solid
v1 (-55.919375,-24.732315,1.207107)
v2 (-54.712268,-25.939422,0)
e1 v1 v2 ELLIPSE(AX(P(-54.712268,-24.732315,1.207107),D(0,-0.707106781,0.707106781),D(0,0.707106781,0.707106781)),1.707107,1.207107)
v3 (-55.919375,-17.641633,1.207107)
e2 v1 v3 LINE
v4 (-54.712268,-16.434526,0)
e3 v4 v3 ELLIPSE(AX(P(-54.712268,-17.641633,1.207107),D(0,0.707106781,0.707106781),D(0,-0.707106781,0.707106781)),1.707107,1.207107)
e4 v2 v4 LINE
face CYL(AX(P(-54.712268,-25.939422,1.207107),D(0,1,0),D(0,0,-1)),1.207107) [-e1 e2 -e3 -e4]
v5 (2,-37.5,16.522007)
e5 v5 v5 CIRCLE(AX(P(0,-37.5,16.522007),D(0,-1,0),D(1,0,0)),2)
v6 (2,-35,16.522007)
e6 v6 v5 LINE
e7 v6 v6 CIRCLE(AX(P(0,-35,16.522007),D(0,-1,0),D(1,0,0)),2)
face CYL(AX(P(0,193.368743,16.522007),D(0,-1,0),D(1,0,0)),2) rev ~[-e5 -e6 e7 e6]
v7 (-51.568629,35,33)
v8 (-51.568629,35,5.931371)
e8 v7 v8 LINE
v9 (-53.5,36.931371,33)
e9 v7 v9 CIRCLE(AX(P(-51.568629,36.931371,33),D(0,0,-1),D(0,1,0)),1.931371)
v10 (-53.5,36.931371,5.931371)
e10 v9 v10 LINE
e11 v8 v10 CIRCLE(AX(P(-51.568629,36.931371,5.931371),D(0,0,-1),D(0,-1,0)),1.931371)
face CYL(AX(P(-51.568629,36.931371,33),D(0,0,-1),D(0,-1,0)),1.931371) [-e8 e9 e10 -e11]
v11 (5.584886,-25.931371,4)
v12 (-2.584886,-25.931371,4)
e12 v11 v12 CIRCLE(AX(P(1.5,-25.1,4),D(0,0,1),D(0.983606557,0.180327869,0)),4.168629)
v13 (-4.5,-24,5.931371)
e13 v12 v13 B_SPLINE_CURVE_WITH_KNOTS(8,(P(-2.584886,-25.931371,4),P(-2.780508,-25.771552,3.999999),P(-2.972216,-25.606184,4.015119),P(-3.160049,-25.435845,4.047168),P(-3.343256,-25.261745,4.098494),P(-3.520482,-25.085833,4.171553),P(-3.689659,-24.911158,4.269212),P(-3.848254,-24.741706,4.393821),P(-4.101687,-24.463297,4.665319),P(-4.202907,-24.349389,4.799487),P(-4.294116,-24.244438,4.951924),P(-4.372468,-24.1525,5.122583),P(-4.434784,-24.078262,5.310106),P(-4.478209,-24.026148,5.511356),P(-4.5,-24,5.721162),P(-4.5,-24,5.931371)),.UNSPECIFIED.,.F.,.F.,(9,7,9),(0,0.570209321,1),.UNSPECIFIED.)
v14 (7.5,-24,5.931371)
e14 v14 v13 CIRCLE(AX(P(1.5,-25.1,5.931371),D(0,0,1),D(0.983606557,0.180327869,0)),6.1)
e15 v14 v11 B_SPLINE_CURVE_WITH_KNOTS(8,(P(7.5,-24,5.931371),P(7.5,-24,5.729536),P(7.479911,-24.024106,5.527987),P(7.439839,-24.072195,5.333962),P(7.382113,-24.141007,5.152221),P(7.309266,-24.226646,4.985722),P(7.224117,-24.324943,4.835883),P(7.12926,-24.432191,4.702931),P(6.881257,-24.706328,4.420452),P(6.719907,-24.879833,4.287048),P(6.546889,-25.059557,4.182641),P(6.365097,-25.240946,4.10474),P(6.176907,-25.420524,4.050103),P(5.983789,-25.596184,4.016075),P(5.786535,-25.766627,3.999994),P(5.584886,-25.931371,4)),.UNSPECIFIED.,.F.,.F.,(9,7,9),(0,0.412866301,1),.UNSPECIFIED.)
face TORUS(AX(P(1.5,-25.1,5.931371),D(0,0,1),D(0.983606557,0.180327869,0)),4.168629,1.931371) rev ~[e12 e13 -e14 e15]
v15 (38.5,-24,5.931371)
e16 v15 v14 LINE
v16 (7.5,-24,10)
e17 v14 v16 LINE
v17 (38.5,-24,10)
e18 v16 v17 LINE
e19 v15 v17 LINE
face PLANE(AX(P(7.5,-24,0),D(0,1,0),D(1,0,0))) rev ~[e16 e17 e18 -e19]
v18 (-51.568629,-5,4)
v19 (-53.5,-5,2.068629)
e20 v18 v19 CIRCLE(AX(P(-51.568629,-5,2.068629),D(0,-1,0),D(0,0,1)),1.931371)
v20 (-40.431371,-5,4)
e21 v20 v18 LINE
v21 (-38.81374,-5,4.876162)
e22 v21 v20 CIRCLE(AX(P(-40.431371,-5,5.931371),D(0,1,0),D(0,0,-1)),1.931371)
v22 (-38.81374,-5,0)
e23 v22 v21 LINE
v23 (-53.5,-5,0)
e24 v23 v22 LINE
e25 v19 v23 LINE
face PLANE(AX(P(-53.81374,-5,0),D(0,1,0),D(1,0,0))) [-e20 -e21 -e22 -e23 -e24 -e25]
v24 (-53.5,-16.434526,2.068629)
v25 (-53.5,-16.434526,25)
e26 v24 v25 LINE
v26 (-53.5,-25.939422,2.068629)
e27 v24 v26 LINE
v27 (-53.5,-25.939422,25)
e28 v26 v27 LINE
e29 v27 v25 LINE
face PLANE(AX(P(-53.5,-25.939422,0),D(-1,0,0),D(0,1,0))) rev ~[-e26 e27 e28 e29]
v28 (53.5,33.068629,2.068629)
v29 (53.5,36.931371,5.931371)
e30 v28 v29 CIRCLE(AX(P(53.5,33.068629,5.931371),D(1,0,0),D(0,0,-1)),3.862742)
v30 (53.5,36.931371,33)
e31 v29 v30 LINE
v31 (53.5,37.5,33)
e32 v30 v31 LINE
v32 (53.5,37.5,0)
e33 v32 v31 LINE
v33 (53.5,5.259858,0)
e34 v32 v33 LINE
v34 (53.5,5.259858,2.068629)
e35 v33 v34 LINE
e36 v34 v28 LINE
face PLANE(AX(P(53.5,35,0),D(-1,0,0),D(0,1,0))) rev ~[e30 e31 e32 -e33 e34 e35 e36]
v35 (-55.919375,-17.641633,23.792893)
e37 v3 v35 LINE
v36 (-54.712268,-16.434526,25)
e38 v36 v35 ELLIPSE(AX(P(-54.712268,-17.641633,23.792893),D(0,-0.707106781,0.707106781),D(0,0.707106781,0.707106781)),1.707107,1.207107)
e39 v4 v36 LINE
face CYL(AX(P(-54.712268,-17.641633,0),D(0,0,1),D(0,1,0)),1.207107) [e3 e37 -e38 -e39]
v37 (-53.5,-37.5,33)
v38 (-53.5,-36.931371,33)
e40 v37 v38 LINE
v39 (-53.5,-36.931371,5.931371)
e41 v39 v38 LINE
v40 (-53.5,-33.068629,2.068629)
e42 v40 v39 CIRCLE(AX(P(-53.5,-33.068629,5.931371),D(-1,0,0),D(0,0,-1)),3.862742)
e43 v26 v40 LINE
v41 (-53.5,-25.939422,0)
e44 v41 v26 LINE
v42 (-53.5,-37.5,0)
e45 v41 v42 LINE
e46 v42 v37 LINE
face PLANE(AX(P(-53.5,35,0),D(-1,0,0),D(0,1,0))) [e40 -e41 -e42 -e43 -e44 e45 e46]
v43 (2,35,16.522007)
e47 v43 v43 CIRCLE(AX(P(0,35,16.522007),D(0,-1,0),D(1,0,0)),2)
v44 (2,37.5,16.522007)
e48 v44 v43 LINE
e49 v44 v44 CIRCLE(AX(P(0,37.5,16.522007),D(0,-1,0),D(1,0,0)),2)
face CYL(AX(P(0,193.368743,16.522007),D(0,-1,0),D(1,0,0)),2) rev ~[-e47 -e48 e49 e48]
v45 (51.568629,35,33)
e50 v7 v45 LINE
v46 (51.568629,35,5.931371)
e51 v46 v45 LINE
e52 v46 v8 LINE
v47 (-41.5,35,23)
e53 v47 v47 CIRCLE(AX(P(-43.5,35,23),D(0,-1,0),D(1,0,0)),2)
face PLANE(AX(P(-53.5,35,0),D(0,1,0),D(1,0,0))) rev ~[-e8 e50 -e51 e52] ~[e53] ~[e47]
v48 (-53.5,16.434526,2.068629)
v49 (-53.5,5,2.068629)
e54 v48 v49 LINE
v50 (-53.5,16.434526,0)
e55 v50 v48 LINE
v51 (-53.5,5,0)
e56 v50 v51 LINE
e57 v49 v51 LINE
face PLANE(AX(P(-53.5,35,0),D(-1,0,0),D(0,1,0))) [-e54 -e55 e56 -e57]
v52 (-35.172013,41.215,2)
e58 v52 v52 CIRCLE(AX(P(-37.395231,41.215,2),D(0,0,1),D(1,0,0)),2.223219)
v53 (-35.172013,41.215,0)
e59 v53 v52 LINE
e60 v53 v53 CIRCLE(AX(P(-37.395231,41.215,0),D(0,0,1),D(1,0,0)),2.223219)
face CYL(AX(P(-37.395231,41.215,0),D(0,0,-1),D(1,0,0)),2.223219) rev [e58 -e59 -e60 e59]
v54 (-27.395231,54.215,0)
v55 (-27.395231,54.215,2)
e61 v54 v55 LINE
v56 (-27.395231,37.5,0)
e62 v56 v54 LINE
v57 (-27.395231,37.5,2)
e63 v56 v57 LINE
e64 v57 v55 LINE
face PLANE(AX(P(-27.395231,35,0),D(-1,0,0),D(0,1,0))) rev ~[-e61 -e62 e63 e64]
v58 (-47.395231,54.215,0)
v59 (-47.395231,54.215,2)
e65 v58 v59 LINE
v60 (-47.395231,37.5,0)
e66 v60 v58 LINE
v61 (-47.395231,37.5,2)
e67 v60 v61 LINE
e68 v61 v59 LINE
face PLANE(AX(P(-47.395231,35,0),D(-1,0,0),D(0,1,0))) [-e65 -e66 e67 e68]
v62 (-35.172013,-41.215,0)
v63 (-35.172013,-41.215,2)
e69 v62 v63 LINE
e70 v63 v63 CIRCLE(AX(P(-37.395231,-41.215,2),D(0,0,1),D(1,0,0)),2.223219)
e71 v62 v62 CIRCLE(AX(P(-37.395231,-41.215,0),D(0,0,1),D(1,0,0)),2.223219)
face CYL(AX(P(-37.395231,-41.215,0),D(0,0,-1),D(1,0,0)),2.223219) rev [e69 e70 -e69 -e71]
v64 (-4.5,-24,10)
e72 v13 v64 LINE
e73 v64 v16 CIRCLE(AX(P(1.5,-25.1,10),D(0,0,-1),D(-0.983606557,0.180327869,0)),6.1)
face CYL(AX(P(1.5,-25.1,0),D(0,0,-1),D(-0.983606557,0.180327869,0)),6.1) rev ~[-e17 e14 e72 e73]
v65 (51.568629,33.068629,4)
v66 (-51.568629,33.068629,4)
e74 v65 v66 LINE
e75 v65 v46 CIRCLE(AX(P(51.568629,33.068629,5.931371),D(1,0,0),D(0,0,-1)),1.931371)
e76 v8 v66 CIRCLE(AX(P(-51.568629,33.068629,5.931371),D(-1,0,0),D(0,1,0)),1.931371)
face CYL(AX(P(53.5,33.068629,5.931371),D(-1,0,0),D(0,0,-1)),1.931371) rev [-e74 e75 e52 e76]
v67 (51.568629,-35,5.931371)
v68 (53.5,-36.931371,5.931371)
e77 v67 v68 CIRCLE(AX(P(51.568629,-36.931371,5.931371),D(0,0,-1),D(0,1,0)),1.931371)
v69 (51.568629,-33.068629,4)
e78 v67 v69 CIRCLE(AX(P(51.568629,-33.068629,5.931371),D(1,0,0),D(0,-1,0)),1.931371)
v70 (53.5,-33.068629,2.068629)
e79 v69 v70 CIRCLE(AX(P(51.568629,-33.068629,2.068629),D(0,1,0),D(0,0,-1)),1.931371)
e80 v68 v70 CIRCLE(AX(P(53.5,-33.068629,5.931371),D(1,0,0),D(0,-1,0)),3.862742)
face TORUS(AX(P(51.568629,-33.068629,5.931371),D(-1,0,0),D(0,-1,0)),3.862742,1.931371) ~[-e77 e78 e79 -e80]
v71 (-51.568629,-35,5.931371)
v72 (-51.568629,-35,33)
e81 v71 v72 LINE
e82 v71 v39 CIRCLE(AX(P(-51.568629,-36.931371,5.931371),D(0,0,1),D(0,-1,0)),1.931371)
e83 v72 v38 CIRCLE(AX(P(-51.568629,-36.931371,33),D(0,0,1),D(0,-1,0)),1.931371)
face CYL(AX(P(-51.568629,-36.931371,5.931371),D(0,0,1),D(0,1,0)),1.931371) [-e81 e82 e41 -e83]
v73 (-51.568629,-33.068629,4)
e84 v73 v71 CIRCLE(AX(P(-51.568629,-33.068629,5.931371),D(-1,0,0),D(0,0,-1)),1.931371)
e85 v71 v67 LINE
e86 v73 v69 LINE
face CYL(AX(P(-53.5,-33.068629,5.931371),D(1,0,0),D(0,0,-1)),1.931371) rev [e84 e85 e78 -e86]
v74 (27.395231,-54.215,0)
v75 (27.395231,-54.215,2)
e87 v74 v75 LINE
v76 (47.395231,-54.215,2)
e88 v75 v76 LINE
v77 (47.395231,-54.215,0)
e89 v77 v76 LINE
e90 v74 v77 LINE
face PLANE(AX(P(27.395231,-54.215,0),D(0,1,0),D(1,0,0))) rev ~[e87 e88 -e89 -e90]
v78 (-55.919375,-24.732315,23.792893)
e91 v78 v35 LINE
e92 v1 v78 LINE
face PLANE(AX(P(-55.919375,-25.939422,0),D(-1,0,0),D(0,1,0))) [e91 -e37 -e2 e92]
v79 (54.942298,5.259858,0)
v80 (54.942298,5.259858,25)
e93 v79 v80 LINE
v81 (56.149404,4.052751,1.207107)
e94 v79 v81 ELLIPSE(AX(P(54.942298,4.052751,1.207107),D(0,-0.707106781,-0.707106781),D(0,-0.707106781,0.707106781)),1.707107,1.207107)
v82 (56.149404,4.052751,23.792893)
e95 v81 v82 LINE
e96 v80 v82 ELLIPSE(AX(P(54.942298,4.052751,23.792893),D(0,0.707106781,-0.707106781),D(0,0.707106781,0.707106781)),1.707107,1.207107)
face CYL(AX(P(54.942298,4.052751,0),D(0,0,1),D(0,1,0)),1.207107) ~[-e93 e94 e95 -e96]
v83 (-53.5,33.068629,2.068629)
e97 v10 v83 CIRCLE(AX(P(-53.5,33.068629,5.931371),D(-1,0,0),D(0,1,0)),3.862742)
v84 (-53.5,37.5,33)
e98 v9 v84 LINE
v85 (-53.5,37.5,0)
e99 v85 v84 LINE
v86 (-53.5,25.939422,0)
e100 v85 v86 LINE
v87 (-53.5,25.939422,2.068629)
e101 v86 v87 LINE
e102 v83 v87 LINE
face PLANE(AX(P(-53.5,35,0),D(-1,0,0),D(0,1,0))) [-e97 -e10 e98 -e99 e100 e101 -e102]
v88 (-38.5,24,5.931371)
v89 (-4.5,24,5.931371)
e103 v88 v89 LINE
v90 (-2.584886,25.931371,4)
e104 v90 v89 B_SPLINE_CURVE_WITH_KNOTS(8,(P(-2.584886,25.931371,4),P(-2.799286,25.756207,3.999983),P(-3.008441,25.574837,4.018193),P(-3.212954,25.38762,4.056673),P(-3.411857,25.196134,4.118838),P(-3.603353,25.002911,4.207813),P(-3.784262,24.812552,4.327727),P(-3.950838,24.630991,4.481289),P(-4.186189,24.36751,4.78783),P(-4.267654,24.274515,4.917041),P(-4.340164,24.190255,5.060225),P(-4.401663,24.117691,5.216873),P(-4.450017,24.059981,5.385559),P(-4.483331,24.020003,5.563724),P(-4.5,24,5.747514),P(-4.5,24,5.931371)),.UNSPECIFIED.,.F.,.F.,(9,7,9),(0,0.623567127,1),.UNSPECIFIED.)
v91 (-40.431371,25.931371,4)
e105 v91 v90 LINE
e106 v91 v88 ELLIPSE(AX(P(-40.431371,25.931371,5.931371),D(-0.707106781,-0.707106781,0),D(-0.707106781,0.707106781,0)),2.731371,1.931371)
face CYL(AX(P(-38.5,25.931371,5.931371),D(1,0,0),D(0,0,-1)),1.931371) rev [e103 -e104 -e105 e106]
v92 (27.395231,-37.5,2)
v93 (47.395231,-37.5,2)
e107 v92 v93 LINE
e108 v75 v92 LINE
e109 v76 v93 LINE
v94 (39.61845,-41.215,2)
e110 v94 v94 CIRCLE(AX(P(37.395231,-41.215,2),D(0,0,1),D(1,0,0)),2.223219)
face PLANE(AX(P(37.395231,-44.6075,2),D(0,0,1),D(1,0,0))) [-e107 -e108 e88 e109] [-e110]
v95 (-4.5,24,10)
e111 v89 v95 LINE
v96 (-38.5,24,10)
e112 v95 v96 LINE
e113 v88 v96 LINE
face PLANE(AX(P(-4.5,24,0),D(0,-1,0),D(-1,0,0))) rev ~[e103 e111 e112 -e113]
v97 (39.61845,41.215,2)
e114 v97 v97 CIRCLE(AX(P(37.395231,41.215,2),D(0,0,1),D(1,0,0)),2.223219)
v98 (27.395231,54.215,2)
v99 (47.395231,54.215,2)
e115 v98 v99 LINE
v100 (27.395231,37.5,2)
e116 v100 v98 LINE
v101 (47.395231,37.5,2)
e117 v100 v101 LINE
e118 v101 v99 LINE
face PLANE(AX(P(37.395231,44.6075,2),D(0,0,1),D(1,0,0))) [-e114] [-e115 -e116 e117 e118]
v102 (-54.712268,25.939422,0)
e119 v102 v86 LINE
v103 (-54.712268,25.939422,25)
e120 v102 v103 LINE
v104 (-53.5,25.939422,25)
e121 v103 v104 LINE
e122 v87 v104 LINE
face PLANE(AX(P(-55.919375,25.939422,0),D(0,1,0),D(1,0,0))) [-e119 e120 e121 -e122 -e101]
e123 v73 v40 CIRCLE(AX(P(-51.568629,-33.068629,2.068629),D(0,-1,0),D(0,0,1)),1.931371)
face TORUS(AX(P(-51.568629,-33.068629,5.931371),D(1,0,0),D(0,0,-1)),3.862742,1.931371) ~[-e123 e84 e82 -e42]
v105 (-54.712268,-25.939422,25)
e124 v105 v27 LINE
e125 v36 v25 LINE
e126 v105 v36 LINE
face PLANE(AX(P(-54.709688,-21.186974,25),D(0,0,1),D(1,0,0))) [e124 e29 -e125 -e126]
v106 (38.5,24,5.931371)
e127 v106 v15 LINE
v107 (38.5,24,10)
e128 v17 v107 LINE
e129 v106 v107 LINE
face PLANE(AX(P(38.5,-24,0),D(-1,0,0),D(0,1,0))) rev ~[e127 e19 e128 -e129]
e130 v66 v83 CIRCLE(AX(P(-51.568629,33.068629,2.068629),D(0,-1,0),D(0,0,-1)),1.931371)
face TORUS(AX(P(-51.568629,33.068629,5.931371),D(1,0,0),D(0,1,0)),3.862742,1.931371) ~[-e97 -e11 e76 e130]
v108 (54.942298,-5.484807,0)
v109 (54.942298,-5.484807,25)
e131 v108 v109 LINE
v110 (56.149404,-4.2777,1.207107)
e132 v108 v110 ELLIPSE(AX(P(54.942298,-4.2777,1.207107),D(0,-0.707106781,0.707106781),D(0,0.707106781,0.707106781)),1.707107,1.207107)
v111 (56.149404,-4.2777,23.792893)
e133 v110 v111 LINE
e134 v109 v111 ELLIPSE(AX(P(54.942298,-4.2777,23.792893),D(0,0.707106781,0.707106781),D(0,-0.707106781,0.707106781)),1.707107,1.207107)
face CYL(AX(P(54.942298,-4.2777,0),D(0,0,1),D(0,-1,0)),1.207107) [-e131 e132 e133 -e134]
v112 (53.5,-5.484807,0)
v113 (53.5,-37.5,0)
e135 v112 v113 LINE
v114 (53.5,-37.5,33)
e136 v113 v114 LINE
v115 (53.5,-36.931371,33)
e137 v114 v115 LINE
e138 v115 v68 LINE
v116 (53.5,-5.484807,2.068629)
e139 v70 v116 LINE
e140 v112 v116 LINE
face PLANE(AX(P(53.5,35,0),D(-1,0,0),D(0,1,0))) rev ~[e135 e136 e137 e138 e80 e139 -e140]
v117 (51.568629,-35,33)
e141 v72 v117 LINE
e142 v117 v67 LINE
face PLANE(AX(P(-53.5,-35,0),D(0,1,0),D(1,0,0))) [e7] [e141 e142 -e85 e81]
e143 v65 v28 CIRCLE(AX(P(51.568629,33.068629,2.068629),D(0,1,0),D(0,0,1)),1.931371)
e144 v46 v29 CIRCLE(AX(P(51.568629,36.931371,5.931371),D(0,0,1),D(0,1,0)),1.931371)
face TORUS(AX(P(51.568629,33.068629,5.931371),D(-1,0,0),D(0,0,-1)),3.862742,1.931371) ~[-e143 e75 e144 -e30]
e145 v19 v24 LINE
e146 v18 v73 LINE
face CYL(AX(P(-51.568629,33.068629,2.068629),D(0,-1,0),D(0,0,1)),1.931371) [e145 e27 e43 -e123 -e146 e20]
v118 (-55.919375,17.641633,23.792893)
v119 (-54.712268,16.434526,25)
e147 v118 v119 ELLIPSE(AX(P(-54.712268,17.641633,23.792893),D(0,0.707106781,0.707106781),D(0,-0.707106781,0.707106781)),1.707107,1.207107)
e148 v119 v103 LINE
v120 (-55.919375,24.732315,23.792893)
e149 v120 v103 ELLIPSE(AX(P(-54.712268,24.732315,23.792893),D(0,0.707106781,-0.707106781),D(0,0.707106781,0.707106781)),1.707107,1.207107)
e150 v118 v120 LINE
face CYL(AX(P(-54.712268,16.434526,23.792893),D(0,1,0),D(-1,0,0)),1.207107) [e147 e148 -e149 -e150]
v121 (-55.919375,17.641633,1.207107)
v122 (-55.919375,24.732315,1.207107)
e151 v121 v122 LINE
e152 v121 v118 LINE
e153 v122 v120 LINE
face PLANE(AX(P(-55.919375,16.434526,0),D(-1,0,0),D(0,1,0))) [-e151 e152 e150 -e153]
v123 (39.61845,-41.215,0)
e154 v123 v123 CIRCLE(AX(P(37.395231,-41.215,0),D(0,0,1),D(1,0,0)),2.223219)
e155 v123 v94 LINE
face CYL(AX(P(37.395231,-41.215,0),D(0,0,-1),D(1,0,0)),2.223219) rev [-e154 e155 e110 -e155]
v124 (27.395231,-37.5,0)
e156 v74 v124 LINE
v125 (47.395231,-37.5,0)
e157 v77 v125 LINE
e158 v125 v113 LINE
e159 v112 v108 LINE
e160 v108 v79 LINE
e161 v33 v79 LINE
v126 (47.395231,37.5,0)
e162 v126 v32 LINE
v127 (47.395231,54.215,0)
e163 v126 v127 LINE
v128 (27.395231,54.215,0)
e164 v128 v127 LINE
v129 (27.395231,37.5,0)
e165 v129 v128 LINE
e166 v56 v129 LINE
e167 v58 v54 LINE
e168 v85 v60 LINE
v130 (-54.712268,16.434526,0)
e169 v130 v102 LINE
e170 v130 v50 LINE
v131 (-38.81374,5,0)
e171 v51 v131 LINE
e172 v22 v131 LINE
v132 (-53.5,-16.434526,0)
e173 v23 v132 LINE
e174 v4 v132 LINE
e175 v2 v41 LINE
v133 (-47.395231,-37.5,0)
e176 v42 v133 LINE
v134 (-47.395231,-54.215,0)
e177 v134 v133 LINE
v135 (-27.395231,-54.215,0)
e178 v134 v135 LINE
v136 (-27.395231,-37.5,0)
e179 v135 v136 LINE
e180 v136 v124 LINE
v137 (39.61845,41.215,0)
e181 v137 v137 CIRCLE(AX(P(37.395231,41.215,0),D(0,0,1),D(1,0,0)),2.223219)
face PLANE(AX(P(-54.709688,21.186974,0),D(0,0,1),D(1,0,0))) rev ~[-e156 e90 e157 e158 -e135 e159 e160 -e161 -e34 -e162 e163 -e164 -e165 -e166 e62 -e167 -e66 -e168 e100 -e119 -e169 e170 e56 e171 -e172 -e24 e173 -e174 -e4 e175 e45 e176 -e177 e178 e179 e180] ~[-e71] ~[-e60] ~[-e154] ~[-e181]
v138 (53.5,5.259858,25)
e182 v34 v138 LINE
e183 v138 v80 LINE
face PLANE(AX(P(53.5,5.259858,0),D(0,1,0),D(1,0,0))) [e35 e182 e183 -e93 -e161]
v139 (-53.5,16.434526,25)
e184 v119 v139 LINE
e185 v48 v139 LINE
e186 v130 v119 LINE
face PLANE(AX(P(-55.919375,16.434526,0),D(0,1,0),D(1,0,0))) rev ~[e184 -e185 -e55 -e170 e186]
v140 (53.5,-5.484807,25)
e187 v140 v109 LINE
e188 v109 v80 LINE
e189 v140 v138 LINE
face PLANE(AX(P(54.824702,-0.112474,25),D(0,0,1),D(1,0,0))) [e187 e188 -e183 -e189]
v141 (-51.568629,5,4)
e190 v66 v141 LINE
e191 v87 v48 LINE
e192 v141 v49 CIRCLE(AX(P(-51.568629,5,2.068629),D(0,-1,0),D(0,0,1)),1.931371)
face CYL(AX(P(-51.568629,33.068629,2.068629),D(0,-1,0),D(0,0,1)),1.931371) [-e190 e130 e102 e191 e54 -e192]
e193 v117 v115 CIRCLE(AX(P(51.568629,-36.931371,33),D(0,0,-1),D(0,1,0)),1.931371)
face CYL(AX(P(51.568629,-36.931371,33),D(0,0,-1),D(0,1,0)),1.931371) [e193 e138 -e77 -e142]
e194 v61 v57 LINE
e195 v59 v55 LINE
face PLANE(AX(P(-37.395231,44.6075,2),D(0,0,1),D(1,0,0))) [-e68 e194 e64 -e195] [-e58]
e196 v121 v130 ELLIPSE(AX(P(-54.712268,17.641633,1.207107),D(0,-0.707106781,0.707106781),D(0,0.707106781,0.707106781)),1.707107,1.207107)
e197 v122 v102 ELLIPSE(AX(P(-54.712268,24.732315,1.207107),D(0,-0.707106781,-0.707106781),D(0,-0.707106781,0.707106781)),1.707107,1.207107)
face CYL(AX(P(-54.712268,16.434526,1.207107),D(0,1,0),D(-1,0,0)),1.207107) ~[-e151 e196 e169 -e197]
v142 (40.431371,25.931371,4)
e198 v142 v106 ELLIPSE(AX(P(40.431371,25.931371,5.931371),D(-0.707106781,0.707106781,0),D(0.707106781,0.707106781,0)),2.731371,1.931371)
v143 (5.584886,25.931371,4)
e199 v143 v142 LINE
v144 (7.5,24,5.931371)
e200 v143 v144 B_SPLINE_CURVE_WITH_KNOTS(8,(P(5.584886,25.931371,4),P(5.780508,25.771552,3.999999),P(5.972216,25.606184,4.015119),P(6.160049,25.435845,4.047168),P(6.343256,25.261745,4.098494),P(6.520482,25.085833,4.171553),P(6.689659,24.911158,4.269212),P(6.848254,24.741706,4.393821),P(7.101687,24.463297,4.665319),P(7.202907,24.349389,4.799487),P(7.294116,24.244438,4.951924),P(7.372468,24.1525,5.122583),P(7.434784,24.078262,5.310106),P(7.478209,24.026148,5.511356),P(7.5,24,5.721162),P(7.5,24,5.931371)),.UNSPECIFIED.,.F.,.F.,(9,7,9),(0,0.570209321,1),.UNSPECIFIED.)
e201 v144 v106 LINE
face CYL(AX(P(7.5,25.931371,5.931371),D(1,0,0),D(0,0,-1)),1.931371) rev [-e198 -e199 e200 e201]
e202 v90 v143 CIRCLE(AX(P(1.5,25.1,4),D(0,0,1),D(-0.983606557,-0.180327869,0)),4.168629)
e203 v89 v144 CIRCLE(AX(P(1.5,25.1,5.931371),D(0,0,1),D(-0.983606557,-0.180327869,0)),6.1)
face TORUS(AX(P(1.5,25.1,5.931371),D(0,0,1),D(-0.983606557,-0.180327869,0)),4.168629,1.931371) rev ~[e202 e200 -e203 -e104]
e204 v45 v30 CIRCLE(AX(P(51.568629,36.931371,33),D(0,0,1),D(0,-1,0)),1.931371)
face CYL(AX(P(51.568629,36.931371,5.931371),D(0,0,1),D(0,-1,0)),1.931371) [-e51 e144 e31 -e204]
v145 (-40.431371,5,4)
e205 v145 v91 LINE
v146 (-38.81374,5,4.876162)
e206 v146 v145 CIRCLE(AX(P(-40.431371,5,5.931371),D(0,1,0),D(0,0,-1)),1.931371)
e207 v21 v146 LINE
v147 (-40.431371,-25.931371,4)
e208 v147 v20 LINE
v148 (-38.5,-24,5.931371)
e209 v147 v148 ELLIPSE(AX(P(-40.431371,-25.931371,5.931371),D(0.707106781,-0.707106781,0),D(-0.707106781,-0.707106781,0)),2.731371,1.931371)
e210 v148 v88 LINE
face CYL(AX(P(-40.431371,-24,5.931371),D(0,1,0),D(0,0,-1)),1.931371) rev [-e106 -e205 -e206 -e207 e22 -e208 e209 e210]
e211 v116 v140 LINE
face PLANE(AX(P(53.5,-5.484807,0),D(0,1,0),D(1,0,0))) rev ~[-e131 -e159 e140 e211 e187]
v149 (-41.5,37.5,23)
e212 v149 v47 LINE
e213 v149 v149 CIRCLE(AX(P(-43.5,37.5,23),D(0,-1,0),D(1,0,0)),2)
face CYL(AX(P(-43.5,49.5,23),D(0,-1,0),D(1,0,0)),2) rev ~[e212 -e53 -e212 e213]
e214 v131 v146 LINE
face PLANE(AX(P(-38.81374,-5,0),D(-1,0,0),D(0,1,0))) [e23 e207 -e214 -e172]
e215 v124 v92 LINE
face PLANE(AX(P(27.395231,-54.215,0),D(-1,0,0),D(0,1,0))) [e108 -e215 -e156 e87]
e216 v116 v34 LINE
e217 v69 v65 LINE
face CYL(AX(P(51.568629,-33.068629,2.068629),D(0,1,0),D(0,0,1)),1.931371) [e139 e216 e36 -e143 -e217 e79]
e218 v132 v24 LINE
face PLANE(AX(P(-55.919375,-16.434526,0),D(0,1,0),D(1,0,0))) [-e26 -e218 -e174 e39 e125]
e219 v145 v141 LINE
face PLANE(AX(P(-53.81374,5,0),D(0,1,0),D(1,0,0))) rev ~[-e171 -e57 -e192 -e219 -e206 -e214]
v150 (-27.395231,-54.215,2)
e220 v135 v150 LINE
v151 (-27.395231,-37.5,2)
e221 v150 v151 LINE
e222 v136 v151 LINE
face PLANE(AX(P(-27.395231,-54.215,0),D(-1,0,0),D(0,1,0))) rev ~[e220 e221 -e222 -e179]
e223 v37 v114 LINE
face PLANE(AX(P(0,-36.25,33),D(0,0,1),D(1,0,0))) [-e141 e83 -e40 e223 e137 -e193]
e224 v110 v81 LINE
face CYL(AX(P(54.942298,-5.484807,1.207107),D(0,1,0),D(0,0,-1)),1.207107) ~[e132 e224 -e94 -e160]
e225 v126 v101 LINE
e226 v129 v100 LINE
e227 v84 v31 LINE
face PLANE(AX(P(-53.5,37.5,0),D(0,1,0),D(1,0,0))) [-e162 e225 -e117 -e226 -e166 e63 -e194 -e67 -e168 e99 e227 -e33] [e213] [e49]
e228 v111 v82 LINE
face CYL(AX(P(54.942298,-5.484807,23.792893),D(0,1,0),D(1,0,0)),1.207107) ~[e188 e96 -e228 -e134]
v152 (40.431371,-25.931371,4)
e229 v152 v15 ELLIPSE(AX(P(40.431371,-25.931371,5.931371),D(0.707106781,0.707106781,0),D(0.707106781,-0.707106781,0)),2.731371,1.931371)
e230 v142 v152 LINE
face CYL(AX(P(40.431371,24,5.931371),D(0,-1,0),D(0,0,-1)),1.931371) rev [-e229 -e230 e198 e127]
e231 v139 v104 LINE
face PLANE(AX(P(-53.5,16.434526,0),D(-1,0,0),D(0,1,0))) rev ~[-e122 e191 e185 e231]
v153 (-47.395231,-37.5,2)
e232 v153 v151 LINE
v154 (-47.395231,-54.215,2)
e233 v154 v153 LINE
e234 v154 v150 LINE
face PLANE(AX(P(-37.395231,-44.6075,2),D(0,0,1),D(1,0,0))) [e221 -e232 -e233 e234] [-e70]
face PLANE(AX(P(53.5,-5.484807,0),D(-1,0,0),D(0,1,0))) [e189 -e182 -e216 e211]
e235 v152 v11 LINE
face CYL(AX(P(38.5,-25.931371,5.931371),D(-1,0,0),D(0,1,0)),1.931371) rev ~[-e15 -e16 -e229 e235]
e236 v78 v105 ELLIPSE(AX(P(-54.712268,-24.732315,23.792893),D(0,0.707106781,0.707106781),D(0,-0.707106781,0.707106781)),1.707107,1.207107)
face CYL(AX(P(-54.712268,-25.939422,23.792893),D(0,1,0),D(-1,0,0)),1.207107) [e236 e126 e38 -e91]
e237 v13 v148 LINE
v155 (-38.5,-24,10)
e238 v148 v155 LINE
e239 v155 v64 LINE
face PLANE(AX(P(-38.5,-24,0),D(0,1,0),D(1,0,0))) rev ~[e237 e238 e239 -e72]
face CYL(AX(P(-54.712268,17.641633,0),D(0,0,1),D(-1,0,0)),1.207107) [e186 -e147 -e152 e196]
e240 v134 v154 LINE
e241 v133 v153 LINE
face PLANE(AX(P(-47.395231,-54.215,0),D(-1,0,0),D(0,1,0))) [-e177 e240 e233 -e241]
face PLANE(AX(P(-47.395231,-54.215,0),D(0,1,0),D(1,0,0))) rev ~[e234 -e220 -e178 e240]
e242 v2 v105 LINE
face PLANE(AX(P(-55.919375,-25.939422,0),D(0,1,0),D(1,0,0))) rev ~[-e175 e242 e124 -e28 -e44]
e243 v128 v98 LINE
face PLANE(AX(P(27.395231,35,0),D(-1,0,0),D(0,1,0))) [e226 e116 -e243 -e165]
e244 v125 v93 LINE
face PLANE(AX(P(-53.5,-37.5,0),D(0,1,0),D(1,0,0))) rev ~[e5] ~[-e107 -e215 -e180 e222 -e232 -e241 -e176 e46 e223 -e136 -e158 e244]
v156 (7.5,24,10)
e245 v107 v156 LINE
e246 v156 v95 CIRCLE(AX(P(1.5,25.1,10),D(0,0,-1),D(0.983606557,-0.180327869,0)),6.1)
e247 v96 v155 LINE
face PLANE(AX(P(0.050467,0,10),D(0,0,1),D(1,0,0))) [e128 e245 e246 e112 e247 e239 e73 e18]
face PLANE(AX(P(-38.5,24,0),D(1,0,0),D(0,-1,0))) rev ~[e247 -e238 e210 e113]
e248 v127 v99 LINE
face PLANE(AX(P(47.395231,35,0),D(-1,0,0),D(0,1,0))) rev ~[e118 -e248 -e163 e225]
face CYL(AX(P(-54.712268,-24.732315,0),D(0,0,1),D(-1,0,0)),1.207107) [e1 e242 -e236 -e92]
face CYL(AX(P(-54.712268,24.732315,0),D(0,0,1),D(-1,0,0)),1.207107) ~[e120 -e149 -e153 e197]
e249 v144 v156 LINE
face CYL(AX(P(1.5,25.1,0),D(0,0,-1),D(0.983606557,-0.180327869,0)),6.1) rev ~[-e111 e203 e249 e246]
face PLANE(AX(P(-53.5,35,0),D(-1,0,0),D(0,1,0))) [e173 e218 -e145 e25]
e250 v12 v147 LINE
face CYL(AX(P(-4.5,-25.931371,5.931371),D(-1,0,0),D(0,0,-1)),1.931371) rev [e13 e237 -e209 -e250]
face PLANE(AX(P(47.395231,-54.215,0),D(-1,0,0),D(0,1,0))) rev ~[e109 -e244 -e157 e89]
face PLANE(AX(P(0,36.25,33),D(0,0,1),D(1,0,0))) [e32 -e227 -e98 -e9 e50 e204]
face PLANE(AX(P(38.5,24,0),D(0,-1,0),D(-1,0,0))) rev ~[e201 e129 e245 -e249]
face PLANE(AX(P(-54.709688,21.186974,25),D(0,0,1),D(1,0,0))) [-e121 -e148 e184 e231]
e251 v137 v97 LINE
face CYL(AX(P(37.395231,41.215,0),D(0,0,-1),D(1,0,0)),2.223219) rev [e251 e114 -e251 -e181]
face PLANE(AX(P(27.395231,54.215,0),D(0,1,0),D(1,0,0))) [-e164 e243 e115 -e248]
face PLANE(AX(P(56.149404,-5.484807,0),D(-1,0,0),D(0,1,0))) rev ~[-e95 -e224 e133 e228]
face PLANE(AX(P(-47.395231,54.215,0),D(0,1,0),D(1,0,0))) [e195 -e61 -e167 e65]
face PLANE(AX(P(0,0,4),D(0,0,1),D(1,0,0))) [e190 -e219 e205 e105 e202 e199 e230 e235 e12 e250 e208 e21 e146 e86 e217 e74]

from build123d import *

# Parameters (mm, degrees)
F1_DEPTH  = 4
F0_W      = 107
F0_H      = 2.5
F2_DEPTH  = 33
F3_W      = 20
F3_H      = 19.215
F3_R      = 2.2232187412
F4_DEPTH  = 2
F6_D      = 4
F6_DEPTH  = 12
F6_TIP    = 1.2017212381
F7_D      = 4
F8_DEPTH  = 10
F9_F1_R   = 1.9313708499
F9_F2_R   = 1.9313708499
F10_W     = 15
F10_H     = 10
F11_DEPTH = 11.3
F0_W_2    = 2.4193752706
F0_H_2    = 9.5048956573
F0_W_3    = 2.649404496
F0_H_3    = 10.744664818
F12_DEPTH = 25
F13_R     = 1.2071067812


with BuildPart() as f1:
    # F0 (on Top) → F1 (new body)
    with BuildSketch(Plane.XY):
        Polygon((-53.5, -35), (53.5, -35), (53.5, -5.4848068394), (53.5, 5.2598579787), (53.5, 35), (-53.5, 35), (-53.5, 25.9394217283), (-53.5, 16.434526071), (-53.5, -16.434526071), (-53.5, -25.9394217283), align=None)
        with BuildLine():
            Line((38.5, 24), (38.5, -24))
            Line((38.5, -24), (7.5, -24))
            ThreePointArc((7.5, -24), (1.5, -19), (-4.5, -24))
            Line((-4.5, -24), (-38.5, -24))
            Line((-38.5, -24), (-38.5, 24))
            Line((-38.5, 24), (-4.5, 24))
            ThreePointArc((-4.5, 24), (1.5, 19), (7.5, 24))
            Line((7.5, 24), (38.5, 24))
        make_face(mode=Mode.SUBTRACT)
    extrude(amount=F1_DEPTH)

    # F0 (on Top) → F2 (join)
    with BuildSketch(Plane.XY):
        with Locations((0, 36.25)):
            Rectangle(F0_W, F0_H)
        with Locations((0, -36.25)):
            Rectangle(F0_W, F0_H)
    extrude(amount=F2_DEPTH)

    # F3 (on face) → F4 (join)
    with BuildSketch(Plane.XY):
        with Locations((-37.3952314258, -44.6075)):
            Rectangle(F3_W, F3_H)
        with Locations((-37.3952314258, -41.215)):
            Circle(F3_R, mode=Mode.SUBTRACT)
        with Locations((37.3952314258, -44.6075)):
            Rectangle(F3_W, F3_H)
        with Locations((37.3952314258, -41.215)):
            Circle(F3_R, mode=Mode.SUBTRACT)
        with Locations((37.3952314258, 44.6075)):
            Rectangle(F3_W, F3_H)
        with Locations((37.3952314258, 41.215)):
            Circle(F3_R, mode=Mode.SUBTRACT)
        with Locations((-37.3952314258, 44.6075)):
            Rectangle(F3_W, F3_H)
        with Locations((-37.3952314258, 41.215)):
            Circle(F3_R, mode=Mode.SUBTRACT)
    extrude(amount=F4_DEPTH)

    # F6
    with Locations(Plane(origin=(0, 37.5, 0), x_dir=(-1, 0, 0), z_dir=(0, 1, 0))):
        with Locations((43.5, 23)):
            Hole(F6_D / 2, depth=F6_DEPTH)
            with Locations((0, 0, -(F6_DEPTH + F6_TIP / 2))):  # 118° drill point
                Cone(0, F6_D / 2, F6_TIP, mode=Mode.SUBTRACT)

    # F7 (through all)
    with Locations(Plane(origin=(0, 37.5, 0), x_dir=(-1, 0, 0), z_dir=(0, 1, 0))):
        with Locations((0, 16.522007063)):
            Hole(F7_D / 2)

    # F0 (on Top) → F8 (join)
    with BuildSketch(Plane.XY):
        with BuildLine():
            Line((7.5, -24), (38.5, -24))
            Line((38.5, -24), (38.5, 24))
            Line((38.5, 24), (7.5, 24))
            ThreePointArc((7.5, 24), (1.5, 19), (-4.5, 24))
            Line((-4.5, 24), (-38.5, 24))
            Line((-38.5, 24), (-38.5, -24))
            Line((-38.5, -24), (-4.5, -24))
            ThreePointArc((-4.5, -24), (1.5, -19), (7.5, -24))
        make_face()
    extrude(amount=F8_DEPTH)

    # F9: fillet of radius 1.9313708499 on 12 edges, made by hand

    # F9_f1
    f9_f1_edges = [f1.edges().sort_by_distance(p)[0] for p in [
        (0, -35, 4),
        (0, 35, 4),
        (1.5, 19, 4),
        (23, 24, 4),
        (38.5, 0, 4),
        (23, -24, 4),
        (1.5, -19, 4),
        (-21.5, -24, 4),
        (-38.5, 0, 4),
        (-21.5, 24, 4),
    ]]
    fillet(f9_f1_edges, radius=F9_F1_R)

    # F9_f2
    f9_f2_edges = [f1.edges().sort_by_distance(p)[0] for p in [
        (53.5, 0, 4),
        (-53.5, 0, 4),
        (-53.5, -34.4343145751, 4.5656854249),
        (-53.5, 34.4343145751, 4.5656854249),
        (53.5, 34.4343145751, 4.5656854249),
        (53.5, -34.4343145751, 4.5656854249),
    ]]
    fillet(f9_f2_edges, radius=F9_F2_R)

    # F10 (on face) → F11 (cut)
    with BuildSketch(Plane.XY):
        with Locations((-46.3137403131, 0)):
            Rectangle(F10_W, F10_H)
    extrude(amount=F11_DEPTH, mode=Mode.SUBTRACT)

    # F0 (on Top) → F12 (join)
    with BuildSketch(Plane.XY):
        with Locations((-54.7096876353, 21.1869738996)):
            Rectangle(F0_W_2, F0_H_2)
        with Locations((-54.7096876353, -21.1869738996)):
            Rectangle(F0_W_2, F0_H_2)
        with Locations((54.824702248, -0.1124744304)):
            Rectangle(F0_W_3, F0_H_3)
    extrude(amount=F12_DEPTH)

    # F13
    f13_edges = [f1.edges().sort_by_distance(p)[0] for p in [
        (-55.919375, 25.939422, 12.5),
        (-55.919375, 16.434526, 12.5),
        (-55.919375, 21.186974, 0),
        (-55.919375, 21.186974, 25),
        (-55.919375, -16.434526, 12.5),
        (-55.919375, -25.939422, 12.5),
        (-55.919375, -21.186974, 0),
        (-55.919375, -21.186974, 25),
        (56.149404, -5.484807, 12.5),
        (56.149404, 5.259858, 12.5),
        (56.149404, -0.112474, 0),
        (56.149404, -0.112474, 25),
    ]]
    fillet(f13_edges, radius=F13_R)


solid = f1.part
